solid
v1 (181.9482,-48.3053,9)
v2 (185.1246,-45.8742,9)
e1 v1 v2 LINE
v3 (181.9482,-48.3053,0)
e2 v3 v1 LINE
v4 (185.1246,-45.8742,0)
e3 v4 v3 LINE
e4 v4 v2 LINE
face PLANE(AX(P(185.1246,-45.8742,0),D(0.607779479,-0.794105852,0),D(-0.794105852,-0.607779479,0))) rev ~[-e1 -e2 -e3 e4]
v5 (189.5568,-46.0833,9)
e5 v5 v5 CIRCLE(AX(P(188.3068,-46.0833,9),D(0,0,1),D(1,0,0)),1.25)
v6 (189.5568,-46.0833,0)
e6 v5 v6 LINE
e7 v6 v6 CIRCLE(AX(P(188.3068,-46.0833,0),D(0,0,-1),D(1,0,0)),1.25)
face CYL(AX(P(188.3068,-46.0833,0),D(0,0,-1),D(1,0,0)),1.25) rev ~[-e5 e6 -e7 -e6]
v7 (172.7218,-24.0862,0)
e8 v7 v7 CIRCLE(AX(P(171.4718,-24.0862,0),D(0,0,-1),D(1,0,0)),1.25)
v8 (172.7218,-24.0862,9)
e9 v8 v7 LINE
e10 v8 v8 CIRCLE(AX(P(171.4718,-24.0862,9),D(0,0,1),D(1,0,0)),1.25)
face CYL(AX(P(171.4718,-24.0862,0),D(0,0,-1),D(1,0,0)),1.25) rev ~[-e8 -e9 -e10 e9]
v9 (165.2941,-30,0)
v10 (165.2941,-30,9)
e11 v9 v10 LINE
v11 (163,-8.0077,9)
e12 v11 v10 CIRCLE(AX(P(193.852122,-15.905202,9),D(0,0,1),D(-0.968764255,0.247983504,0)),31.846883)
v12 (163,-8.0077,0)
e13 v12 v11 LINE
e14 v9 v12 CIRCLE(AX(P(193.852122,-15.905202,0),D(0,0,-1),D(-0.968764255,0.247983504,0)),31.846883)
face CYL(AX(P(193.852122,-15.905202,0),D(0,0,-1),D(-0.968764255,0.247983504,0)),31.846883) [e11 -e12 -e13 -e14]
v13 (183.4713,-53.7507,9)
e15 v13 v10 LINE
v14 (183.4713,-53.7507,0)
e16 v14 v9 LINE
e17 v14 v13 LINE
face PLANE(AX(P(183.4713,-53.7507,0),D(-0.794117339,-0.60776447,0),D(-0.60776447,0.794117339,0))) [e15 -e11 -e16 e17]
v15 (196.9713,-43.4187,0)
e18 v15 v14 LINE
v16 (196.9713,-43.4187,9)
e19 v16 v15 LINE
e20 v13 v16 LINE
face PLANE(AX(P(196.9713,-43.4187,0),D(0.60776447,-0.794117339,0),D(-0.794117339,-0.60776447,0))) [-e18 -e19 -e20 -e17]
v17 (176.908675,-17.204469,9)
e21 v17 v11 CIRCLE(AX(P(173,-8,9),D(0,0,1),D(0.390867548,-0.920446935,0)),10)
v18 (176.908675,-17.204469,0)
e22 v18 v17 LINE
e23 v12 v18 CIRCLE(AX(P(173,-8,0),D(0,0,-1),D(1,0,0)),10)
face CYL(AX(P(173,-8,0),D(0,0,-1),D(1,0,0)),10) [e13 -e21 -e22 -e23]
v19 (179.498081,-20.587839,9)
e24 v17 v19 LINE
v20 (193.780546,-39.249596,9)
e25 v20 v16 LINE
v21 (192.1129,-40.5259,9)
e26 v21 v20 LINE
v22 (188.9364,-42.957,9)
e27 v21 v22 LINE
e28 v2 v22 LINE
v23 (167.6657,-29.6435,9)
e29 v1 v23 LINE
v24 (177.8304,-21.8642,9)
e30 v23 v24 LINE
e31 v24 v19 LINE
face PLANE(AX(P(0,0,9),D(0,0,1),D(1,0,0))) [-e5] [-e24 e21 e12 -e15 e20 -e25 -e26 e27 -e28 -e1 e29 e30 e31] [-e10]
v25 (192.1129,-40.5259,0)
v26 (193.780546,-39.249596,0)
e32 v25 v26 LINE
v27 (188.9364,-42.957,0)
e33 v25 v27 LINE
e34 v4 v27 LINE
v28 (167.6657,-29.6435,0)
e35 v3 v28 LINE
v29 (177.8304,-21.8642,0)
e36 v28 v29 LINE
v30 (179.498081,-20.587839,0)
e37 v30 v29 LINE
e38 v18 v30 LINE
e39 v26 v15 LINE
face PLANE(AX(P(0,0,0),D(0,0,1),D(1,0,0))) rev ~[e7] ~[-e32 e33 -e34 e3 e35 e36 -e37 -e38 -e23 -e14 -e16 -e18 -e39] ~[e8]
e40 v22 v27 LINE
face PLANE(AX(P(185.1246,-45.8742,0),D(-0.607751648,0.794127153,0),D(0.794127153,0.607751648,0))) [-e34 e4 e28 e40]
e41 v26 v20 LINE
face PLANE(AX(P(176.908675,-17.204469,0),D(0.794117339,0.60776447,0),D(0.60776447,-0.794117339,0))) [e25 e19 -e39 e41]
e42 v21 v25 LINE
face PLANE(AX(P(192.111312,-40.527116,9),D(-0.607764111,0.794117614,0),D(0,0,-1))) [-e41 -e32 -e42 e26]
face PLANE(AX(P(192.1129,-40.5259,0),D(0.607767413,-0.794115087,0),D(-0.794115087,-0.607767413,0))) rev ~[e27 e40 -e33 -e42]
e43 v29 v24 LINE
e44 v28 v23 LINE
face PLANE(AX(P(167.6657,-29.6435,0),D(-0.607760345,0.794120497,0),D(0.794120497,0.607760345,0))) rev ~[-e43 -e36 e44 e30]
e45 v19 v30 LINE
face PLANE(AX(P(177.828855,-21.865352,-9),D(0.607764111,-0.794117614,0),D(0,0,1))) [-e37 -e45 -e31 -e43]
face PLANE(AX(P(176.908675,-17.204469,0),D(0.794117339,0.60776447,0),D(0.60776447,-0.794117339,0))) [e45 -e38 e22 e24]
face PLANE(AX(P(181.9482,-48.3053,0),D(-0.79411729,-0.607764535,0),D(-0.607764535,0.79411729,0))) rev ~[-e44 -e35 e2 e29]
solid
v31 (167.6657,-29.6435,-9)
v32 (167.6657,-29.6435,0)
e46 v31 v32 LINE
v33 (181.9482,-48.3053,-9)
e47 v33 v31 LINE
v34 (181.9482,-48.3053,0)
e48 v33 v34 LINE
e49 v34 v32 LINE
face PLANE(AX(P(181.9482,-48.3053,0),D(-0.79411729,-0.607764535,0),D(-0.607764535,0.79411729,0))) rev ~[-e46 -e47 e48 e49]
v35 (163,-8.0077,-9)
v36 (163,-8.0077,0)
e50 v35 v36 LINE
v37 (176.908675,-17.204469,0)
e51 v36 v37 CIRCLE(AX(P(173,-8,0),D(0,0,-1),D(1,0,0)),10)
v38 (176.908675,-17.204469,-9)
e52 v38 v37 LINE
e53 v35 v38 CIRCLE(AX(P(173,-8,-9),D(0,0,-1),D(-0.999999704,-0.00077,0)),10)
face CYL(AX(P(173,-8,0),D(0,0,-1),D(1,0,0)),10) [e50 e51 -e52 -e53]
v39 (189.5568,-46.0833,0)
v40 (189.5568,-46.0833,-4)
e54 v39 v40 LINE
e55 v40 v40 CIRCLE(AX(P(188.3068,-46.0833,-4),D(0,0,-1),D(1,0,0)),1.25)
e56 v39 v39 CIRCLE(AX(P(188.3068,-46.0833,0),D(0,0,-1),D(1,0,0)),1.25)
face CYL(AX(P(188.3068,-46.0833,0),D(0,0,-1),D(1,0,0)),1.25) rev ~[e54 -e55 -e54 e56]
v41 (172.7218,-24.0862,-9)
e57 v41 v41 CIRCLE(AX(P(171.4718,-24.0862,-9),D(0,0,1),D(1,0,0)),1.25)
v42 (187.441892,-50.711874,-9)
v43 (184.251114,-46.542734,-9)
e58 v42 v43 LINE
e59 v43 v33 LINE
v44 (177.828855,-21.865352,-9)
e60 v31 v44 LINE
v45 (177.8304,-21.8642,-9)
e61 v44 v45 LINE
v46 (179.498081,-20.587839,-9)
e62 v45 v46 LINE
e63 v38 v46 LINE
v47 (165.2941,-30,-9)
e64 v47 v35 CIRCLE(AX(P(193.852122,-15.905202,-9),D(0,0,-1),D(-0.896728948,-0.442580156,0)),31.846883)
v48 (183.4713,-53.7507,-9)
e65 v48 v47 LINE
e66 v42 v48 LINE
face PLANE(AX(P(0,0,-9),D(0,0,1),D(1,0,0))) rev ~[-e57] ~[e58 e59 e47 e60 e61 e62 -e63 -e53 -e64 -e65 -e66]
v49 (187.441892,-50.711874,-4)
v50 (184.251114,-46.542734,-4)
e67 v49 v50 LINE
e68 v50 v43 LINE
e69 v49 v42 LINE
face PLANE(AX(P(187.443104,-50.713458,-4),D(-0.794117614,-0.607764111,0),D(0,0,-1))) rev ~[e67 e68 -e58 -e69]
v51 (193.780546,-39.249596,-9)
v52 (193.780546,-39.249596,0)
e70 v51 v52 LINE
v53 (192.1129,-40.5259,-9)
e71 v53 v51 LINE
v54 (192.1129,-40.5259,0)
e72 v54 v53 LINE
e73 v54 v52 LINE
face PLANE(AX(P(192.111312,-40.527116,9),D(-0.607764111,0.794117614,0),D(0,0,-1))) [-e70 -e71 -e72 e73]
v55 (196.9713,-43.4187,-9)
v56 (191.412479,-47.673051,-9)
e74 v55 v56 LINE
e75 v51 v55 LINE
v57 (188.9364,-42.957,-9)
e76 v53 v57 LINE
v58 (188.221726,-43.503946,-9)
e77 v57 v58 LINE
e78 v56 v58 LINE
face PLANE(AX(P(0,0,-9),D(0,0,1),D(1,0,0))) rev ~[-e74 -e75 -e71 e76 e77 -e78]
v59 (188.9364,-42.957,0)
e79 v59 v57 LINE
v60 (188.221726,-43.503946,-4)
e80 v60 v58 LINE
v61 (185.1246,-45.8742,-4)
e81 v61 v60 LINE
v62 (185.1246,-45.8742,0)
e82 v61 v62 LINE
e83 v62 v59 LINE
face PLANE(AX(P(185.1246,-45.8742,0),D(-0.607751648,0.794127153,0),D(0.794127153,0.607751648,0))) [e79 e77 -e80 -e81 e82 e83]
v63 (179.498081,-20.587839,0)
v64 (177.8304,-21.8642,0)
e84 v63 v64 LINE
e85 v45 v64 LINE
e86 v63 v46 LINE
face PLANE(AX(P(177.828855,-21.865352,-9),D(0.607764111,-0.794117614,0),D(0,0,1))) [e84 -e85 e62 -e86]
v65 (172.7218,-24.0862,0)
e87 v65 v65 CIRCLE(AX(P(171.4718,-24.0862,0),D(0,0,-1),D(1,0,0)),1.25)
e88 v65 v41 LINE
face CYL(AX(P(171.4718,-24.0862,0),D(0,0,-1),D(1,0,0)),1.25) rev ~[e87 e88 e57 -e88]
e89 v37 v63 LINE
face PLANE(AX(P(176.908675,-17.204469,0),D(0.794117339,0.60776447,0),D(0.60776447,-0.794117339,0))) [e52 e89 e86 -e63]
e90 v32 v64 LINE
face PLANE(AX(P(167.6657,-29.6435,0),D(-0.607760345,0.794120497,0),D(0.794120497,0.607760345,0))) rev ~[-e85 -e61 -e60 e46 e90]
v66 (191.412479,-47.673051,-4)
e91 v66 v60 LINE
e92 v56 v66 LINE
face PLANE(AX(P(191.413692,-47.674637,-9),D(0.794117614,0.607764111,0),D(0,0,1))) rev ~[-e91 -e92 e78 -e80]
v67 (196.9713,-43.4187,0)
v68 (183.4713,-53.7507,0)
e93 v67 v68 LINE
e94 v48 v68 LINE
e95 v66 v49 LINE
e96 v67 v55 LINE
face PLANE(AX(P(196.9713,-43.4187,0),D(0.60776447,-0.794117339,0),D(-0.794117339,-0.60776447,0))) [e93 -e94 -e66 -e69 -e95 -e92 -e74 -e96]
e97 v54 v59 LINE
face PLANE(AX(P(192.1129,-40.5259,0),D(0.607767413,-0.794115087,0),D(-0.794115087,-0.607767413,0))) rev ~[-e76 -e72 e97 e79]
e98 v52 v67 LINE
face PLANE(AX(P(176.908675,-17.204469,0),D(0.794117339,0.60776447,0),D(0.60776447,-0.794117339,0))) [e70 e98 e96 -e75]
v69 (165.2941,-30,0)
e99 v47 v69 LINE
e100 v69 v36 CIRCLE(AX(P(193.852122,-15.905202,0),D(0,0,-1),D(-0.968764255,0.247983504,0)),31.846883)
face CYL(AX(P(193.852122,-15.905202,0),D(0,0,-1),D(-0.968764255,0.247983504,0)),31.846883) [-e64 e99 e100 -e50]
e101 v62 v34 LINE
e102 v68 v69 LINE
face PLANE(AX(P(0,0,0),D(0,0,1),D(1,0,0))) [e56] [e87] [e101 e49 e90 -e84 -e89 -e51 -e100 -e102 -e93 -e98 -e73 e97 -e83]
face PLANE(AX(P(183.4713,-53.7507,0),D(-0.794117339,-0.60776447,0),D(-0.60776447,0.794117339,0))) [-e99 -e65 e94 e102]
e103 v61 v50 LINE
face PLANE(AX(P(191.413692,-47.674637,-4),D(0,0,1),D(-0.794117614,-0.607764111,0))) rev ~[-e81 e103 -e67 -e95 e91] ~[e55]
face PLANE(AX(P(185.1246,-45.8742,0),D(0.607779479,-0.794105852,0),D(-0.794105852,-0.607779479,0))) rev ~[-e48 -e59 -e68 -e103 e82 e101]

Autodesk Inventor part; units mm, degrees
ref_plane "YZ Plane" through (0, 0, 0) normal (1, 0, 0) x (0, 1, 0)
ref_plane "XZ Plane" through (0, 0, 0) normal (0, 1, 0) x (-1, 0, 0)
ref_plane "XY Plane" through (0, 0, 0) normal (0, 0, 1) x (1, 0, 0)
sketch "스케치2" plane through (0, 0, 0) normal (0, 0, 1) x (1, 0, 0)
  line L0 (168.2265, -29.7181) -> (182.0227, -47.7445)
  line L1 (191.5521, -40.4514) -> (177.7559, -22.4249)
  line L2 (177.7559, -22.4249) -> (168.2265, -29.7181)
  line L3 (172.1391, -30.8815) -> (212.5451, -83.6769) projected
  line L4 (175.1246, -38.7313) -> (184.654, -31.4381) construction
  line L5 (172.9912, -26.0715) -> (186.7874, -44.098) construction
  line L6 (185.1992, -45.3135) -> (187.5087, -48.3311)
  line L7 (187.5087, -48.3311) -> (190.6852, -45.9001)
  line L8 (190.6852, -45.9001) -> (188.3757, -42.8824)
  line L9 (176.3073, -16.4187) -> (196.9713, -43.4187)
  line L10 (196.9713, -43.4187) -> (183.4713, -53.7507)
  line L11 (183.4713, -53.7507) -> (162.8073, -26.7507)
  line L12 (162.8073, -26.7507) -> (176.3073, -16.4187)
  line L13 (176.3073, -16.4187) -> (183.4713, -53.7507) construction
  line L14 (196.9713, -43.4187) -> (162.8073, -26.7507) construction
  line L15 (182.0227, -47.7445) -> (185.1992, -45.3135)
  line L16 (188.3757, -42.8824) -> (191.5521, -40.4514)
  line L17 (177.8304, -21.8642) -> (192.1129, -40.5259)
  line L18 (192.1129, -40.5259) -> (188.9364, -42.957)
  line L19 (188.9364, -42.957) -> (191.2459, -45.9746)
  line L20 (191.2459, -45.9746) -> (187.4341, -48.8919)
  line L21 (187.4341, -48.8919) -> (185.1246, -45.8742)
  line L22 (185.1246, -45.8742) -> (181.9482, -48.3053)
  line L23 (181.9482, -48.3053) -> (167.6657, -29.6435)
  line L24 (167.6657, -29.6435) -> (177.8304, -21.8642)
  circle A0 centre (173, -8) radius 10 projected
  line L25 (185.1246, -45.8742) -> (188.9364, -42.957)
  circle A1 centre (171.4718, -24.0862) radius 1.25
  circle A2 centre (188.3068, -46.0833) radius 1.25
  arc A3 (163, -8.0077) -> (165.2941, -30) centre (193.8521, -15.9052) ccw
  point P0 (0, 0)
  point P1 (179.8893, -35.0847)
  point P2 (179.8893, -35.0847)
  point P3 (176.9087, -17.2045)
  point P4 (174.3632, -17.9067)
  point P5 (163.6763, -26.0857)
  dimension "d0" = 22.7
  dimension "d1" = 12
  dimension "d2" = 4
  dimension "d3" = 26.5
  dimension "d4" = 34
  dimension "d5" = 17
  dimension "d6" = 0.4
  dimension "d9" = 2.5
  dimension "d10" = 2.5
  dimension "d16" = 3.6
extrude "돌출1" add sketch "스케치2" along normal mid plane 18 contours L25 L6 L7 L8 L19 L20 L21 | L25 L8 L7 L6 | L12 A0 L9 | L9 A0 L12 | L9 L10 L11 A3 L12 A0 | L12 A3 A0
sketch "스케치3" plane through (192.1129, -40.5259, -9) normal (-0.7941176, -0.6077641, 0) x (0, 0, 1)
  line L0 (18, 0) -> (0, 0) projected
  line L1 (18, 23.5) -> (18, 0) projected
  line L2 (0, 23.5) -> (18, 23.5) projected
  line L3 (0, 0) -> (0, 23.5) projected
  point P0 (9, 148.9416)
extrude "돌출2" cut sketch "스케치3" against normal blind 18
sketch "스케치4" plane through (196.9713, -43.4187, -9) normal (0.6077641, -0.7941176, 0) x (0.7941176, 0.6077641, 0)
  line L0 (0, 0) -> (-17, 0) projected
  line L1 (-12, 0) -> (-7, 0)
  line L2 (-7, 0) -> (-7, 5)
  line L3 (-7, 5) -> (-12, 5)
  line L4 (-12, 5) -> (-12, 0)
  point P0 (-130.03, 9)
  point P1 (-7, 0)
extrude "돌출3" cut sketch "스케치4" against normal blind 18
split body "분할1" result two bodies by plane through (0, 0, 0) normal (0, 0, 1) first body at (174.2785, -9.3972, 8.5)
properties part number "SAFRS-P-0021"
